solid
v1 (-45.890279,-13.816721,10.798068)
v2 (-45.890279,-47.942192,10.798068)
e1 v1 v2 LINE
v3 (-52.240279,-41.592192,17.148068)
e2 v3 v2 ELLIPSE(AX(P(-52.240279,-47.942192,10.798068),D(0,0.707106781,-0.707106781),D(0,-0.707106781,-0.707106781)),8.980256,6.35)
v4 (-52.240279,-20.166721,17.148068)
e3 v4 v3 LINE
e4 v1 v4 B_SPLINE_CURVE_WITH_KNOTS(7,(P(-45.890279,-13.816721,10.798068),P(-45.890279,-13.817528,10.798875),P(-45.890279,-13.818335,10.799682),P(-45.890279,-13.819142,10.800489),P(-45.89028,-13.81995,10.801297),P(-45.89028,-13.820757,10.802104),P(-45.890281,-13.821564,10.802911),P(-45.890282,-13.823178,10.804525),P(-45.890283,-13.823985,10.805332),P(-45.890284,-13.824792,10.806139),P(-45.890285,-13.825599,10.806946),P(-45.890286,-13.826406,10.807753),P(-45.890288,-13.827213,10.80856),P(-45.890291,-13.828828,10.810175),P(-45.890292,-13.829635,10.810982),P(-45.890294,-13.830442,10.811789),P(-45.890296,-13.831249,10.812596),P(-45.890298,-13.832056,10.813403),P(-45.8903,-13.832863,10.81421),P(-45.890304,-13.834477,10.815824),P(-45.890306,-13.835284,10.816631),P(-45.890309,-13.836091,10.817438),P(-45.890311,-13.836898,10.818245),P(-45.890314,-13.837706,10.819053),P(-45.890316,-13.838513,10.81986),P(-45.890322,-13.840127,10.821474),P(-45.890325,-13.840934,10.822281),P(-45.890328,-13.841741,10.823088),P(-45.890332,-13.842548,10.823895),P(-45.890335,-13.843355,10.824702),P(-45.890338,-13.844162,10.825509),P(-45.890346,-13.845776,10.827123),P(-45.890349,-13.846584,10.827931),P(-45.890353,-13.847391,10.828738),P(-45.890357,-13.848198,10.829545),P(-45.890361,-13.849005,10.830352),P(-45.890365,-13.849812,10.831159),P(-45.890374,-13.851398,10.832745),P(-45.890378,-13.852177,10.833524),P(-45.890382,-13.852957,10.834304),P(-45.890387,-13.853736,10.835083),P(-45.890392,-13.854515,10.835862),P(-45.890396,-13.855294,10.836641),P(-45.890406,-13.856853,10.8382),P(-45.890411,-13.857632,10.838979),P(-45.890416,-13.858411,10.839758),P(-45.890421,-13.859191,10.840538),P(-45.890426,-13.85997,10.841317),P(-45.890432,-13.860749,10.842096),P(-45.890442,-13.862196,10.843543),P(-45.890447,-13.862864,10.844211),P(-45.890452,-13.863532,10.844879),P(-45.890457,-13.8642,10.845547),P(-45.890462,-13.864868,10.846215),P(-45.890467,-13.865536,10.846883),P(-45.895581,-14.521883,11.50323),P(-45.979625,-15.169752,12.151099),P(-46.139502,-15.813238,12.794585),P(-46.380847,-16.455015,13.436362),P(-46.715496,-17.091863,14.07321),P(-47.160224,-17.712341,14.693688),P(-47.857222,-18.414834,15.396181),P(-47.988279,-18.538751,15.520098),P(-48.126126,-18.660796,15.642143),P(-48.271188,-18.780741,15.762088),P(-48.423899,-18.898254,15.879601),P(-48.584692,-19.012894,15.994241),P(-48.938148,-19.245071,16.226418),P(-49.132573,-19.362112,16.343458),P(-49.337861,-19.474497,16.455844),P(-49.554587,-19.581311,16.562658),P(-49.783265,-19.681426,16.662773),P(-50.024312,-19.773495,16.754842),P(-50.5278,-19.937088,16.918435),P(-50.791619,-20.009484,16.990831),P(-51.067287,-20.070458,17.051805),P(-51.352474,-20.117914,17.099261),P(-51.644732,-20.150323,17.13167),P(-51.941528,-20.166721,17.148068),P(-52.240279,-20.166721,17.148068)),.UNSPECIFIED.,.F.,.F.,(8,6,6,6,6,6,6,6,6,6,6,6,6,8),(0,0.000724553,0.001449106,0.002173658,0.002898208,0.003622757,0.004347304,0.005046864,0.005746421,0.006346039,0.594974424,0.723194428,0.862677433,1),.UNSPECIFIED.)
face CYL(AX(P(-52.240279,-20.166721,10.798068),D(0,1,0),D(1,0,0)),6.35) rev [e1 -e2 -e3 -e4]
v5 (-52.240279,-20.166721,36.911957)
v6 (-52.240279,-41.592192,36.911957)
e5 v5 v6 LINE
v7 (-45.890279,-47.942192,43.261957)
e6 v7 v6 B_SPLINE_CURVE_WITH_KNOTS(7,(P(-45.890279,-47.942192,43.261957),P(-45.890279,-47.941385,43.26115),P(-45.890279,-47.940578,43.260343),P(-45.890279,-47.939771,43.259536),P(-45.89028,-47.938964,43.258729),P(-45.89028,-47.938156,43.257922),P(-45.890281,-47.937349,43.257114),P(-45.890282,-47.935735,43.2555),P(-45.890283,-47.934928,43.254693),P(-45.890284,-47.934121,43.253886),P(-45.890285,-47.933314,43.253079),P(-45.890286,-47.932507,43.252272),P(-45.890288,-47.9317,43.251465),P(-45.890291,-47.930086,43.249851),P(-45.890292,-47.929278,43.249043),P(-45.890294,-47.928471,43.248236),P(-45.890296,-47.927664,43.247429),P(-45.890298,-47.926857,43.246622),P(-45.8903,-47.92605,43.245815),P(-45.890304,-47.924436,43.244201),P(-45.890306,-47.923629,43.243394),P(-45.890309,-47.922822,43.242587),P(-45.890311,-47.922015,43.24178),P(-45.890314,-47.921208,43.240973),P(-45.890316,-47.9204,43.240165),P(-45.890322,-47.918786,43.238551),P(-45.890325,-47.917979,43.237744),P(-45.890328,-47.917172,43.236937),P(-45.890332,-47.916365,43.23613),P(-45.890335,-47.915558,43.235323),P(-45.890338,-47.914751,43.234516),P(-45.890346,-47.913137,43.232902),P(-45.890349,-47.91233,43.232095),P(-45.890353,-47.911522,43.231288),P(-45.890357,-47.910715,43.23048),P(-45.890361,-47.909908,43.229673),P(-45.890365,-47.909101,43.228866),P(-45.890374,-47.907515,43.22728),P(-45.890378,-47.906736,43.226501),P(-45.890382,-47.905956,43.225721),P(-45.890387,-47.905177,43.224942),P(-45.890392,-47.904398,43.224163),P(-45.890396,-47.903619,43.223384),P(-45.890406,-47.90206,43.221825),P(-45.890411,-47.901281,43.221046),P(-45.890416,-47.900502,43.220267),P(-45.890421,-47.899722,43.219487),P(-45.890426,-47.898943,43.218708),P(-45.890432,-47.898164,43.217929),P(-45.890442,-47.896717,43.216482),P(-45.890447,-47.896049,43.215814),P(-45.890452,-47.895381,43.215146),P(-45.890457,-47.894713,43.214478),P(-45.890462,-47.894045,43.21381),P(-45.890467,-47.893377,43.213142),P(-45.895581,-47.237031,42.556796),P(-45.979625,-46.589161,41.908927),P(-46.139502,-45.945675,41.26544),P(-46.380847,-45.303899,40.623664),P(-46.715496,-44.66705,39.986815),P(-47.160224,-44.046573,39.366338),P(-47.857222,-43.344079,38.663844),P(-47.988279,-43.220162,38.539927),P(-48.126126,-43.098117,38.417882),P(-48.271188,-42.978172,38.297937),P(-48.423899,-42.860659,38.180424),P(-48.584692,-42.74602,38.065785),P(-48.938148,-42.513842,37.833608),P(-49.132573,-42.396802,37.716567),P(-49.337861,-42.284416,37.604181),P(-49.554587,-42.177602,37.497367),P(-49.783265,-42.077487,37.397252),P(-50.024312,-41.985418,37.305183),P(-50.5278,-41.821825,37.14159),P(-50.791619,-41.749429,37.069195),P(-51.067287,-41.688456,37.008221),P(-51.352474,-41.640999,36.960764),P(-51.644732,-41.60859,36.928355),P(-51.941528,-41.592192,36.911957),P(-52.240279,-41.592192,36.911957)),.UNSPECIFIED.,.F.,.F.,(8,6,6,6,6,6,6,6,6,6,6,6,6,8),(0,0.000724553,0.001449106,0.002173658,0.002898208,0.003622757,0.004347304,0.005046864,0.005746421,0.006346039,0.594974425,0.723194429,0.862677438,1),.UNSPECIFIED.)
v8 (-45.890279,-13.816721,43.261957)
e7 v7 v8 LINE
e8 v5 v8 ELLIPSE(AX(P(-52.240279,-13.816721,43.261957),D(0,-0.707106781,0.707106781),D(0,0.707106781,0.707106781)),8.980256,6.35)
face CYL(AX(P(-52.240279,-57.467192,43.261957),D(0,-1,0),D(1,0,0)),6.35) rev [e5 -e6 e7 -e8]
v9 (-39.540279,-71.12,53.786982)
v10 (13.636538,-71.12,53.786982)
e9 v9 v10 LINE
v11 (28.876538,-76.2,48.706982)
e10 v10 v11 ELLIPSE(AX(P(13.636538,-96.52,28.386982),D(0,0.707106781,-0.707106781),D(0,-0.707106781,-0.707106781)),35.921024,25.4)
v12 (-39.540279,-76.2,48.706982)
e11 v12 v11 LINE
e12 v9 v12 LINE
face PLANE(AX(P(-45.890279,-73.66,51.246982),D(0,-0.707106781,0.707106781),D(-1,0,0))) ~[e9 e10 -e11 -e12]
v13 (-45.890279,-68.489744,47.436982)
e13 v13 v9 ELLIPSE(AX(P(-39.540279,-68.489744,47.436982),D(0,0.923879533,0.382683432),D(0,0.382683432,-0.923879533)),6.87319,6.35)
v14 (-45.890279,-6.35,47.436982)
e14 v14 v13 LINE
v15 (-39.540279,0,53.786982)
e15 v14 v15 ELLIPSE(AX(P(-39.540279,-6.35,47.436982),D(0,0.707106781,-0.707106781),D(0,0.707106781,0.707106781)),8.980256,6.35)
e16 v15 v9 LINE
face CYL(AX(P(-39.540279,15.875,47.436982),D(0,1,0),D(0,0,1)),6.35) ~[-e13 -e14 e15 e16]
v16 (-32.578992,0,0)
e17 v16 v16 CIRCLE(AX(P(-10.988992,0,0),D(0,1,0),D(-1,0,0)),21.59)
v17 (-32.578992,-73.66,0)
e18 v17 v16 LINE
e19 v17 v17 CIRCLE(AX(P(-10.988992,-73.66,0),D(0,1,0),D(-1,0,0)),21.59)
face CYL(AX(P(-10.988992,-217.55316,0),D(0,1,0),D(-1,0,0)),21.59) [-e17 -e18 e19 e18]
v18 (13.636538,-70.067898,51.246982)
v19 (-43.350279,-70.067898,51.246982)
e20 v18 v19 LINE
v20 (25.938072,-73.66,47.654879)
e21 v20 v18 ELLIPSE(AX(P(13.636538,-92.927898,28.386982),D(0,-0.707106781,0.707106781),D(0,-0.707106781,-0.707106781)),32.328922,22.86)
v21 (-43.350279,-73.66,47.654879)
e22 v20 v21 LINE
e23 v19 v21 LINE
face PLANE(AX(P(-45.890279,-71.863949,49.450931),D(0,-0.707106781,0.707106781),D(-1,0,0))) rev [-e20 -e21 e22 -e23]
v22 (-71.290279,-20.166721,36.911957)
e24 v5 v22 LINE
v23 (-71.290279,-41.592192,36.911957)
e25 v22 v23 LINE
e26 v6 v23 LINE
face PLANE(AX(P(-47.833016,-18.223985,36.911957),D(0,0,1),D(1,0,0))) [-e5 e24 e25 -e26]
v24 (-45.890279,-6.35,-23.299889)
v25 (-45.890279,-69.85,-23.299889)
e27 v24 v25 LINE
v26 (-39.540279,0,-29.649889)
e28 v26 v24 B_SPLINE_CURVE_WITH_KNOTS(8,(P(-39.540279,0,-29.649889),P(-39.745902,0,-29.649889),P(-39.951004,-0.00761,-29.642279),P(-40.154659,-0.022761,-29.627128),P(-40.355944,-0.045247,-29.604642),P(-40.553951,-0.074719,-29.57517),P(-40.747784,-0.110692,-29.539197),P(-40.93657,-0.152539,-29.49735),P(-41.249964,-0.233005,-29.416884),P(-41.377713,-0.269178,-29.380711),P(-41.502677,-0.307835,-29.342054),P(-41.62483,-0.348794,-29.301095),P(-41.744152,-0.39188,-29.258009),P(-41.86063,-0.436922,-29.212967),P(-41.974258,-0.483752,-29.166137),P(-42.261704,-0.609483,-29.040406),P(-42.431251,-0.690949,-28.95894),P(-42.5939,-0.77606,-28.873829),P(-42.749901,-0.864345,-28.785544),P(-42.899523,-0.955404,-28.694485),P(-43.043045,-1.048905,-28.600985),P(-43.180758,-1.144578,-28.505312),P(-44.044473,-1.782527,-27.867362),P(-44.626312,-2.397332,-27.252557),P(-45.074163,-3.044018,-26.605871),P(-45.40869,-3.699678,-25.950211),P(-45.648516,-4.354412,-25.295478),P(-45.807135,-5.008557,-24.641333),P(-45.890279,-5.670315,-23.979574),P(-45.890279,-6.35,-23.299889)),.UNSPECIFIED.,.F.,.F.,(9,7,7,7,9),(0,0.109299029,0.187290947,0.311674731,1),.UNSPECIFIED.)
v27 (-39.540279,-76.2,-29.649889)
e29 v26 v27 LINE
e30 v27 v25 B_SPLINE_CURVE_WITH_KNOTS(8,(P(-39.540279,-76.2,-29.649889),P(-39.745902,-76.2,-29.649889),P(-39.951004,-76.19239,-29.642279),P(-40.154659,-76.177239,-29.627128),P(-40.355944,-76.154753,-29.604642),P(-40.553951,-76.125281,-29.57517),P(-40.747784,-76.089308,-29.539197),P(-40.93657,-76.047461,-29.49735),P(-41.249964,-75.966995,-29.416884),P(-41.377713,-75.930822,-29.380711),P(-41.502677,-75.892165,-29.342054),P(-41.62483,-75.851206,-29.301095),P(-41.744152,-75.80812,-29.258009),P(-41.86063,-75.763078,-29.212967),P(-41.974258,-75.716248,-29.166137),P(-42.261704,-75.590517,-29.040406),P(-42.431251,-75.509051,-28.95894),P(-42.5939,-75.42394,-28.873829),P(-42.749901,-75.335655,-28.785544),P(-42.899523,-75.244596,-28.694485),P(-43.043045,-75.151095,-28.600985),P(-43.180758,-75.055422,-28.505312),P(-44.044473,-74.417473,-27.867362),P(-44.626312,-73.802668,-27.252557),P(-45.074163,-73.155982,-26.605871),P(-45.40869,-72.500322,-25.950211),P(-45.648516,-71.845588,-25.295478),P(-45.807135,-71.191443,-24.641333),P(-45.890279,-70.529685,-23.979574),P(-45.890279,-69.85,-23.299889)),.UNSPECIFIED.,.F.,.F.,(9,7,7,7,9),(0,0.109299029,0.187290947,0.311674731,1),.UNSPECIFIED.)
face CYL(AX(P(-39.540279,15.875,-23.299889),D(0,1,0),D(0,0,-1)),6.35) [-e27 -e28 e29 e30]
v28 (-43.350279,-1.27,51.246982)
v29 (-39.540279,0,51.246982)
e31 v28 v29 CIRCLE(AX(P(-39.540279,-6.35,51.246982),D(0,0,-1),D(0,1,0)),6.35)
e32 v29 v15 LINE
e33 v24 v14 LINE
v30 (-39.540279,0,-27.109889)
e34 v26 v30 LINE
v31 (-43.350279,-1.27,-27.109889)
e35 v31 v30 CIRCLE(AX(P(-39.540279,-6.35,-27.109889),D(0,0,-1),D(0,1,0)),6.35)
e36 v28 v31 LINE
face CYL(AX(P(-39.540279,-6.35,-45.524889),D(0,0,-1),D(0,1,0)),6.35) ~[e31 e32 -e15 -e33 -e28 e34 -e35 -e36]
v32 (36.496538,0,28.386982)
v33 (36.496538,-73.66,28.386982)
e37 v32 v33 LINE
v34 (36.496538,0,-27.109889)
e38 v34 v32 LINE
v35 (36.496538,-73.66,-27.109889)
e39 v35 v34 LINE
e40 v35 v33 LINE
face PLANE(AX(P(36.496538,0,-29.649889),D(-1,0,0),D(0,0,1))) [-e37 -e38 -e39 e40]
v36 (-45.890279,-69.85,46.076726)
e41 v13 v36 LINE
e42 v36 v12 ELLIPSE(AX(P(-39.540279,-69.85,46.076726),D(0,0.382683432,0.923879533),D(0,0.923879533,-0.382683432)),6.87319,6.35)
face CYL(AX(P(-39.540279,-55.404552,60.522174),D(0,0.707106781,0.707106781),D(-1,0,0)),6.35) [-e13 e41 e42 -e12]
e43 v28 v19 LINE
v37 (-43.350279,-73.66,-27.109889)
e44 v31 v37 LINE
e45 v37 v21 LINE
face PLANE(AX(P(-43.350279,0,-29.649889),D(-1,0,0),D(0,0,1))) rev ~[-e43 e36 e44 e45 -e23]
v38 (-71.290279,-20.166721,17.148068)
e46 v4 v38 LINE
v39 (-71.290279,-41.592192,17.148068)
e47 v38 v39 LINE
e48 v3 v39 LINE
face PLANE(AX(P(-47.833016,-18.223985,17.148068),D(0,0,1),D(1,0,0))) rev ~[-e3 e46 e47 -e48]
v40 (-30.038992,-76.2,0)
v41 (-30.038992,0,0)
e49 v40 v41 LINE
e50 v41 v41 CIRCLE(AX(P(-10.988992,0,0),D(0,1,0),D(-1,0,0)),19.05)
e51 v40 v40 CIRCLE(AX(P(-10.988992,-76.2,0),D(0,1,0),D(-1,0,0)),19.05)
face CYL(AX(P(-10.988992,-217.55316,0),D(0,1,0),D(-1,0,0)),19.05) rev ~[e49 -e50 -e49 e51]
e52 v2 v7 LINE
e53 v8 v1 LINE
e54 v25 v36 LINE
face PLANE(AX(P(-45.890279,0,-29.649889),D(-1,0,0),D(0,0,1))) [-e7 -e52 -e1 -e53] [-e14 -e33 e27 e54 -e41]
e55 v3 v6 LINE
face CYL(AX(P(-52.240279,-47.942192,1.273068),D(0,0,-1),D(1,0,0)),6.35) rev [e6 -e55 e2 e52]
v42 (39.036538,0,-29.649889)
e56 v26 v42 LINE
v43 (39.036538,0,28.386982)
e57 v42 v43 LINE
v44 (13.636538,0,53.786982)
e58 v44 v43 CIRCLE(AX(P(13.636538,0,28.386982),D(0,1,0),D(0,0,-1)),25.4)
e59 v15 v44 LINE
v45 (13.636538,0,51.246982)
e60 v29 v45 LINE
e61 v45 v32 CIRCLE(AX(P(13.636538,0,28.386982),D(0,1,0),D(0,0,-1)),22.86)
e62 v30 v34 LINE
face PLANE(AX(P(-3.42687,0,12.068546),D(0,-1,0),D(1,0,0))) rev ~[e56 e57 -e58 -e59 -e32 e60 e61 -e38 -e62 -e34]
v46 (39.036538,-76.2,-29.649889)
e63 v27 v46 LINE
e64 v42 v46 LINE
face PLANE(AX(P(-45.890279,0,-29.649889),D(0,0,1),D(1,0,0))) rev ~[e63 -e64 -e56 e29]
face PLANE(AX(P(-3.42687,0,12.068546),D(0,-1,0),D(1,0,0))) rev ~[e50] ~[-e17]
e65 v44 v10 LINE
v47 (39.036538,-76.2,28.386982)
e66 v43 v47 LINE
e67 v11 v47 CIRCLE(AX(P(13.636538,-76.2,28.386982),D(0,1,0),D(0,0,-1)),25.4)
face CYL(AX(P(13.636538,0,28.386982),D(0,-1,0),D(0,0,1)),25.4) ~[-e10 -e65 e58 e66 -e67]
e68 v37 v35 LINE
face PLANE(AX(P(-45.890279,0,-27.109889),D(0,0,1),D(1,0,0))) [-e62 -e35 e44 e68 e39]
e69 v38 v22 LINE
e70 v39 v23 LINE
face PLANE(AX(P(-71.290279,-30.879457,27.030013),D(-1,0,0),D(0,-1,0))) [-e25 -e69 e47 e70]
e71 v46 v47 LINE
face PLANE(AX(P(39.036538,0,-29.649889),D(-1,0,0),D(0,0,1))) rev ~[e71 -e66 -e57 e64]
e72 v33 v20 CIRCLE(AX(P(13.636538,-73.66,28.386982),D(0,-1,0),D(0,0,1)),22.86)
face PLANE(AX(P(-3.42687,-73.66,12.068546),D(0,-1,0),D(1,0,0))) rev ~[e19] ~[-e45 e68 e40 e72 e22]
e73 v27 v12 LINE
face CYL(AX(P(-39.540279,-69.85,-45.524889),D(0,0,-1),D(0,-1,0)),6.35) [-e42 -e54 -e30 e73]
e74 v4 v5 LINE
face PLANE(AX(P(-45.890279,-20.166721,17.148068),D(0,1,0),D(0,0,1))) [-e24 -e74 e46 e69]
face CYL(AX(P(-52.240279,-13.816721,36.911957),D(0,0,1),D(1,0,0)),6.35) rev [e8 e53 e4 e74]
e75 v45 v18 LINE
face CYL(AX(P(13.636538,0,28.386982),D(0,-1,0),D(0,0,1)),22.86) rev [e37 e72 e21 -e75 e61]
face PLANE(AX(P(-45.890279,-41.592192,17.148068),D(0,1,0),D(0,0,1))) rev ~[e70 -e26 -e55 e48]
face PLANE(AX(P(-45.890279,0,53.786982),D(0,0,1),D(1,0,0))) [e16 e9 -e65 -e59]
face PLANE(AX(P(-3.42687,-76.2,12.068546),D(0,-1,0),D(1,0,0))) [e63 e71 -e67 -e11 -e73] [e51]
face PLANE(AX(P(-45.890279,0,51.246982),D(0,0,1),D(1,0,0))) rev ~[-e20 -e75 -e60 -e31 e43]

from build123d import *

# Parameters (mm, degrees)
F0_W          = 84.9268175662
F0_H          = 83.4368709475
F1_DEPTH      = 76.2
F2_SIZE       = 5.08
F3_R          = 25.4
F5_D          = 38.1
F8_T          = -2.54
F9_W          = 21.4254707098
F9_H          = 19.7638887912
F10_DEPTH     = 25.4
F11_T1_DEPTH  = 19.7638887912
F11_T3_DEPTH  = 21.4254707098
F11_T9_DEPTH  = 35.6388887912
F11_T13_DEPTH = 37.3004707098
F11_T20_DEPTH = 35.6388887912
F11_T24_DEPTH = 37.3004707098
F11_T31_DEPTH = 37.3004707098
F11_T35_DEPTH = 35.6388887912
F11_T42_DEPTH = 35.6388887912
F11_T46_DEPTH = 37.3004707098
F11_T49_DEPTH = 102.87
F11_T51_DEPTH = 38.9342048969
F11_T53_DEPTH = 115.1868709475
F11_T55_DEPTH = 110.1068709475
F11_T57_DEPTH = 107.95


# Not quite as in the source:
# - a fillet or chamfer that OpenCascade refuses, or shapes differently, is made with other operations: its cross-section is extruded or revolved along the edge and cut away or added


with BuildPart() as f1:
    # F0 (on Front) → F1 (new body)
    with BuildSketch(Plane.XZ):
        with Locations((-3.4268703312, 12.0685463771)):
            Rectangle(F0_W, F0_H)
    extrude(amount=F1_DEPTH)

    # F2
    f2_edges = [f1.edges().sort_by_distance(p)[0] for p in [
        (-3.42687, -76.2, 53.786982),
    ]]
    chamfer(f2_edges, length=F2_SIZE)

    # F3
    f3_edges = [f1.edges().sort_by_distance(p)[0] for p in [
        (39.036538, -35.56, 53.786982),
    ]]
    fillet(f3_edges, radius=F3_R)

    # F5 (through all)
    with Locations(Plane.XZ.offset(76.2)):
        with Locations((-10.9889917076, 0)):
            Hole(F5_D / 2)

    # F8
    f8_openings = [f1.faces().sort_by_distance(p)[0] for p in [
        (-16.12687, 0, 52.596424),
    ]]
    offset(amount=F8_T, openings=f8_openings)

    # F9 (on face) → F10 (join)
    with BuildSketch(Plane(origin=(-45.8902791142, 0, 0), x_dir=(0, -1, 0), z_dir=(-1, 0, 0))):
        with Locations((30.8794565499, 27.0300125703)):
            Rectangle(F9_W, F9_H)
    extrude(amount=F10_DEPTH)

    # F11: fillet of radius 6.35 on 9 edges, made by hand

    # F11_s2 → F11_t1 (join)
    with BuildSketch(Plane.XY.offset(17.1480681747)):
        with BuildLine():
            ThreePointArc((-45.8902791142, -13.816721195), (-47.7501510537, -18.3068492555), (-52.2402791142, -20.166721195))
            Line((-52.2402791142, -20.166721195), (-45.8902791142, -20.166721195))
            Line((-45.8902791142, -20.166721195), (-45.8902791142, -13.816721195))
        make_face()
        with BuildLine():
            ThreePointArc((-45.8902791142, -47.9421919048), (-47.7501510537, -43.4520638442), (-52.2402791142, -41.5921919048))
            Line((-52.2402791142, -41.5921919048), (-45.8902791142, -41.5921919048))
            Line((-45.8902791142, -41.5921919048), (-45.8902791142, -47.9421919048))
        make_face()
    extrude(amount=F11_T1_DEPTH)

    # F11_s4 → F11_t3 (join)
    with BuildSketch(Plane.XZ.offset(20.166721195)):
        with BuildLine():
            ThreePointArc((-45.8902791142, 43.2619569659), (-47.7501510537, 38.7718289054), (-52.2402791142, 36.9119569659))
            Line((-52.2402791142, 36.9119569659), (-45.8902791142, 36.9119569659))
            Line((-45.8902791142, 36.9119569659), (-45.8902791142, 43.2619569659))
        make_face()
        with BuildLine():
            ThreePointArc((-45.8902791142, 10.7980681747), (-47.7501510537, 15.2881962353), (-52.2402791142, 17.1480681747))
            Line((-52.2402791142, 17.1480681747), (-45.8902791142, 17.1480681747))
            Line((-45.8902791142, 17.1480681747), (-45.8902791142, 10.7980681747))
        make_face()
    extrude(amount=F11_T3_DEPTH)


with BuildPart() as f11_tool7:
    # F11_s8 → F11_t9 (new body)
    with BuildSketch(Plane.XY.offset(52.7869569659)):
        with BuildLine():
            ThreePointArc((-45.8902791142, -13.816721195), (-47.7501510537, -18.3068492555), (-52.2402791142, -20.166721195))
            Line((-52.2402791142, -20.166721195), (-45.8902791142, -20.166721195))
            Line((-45.8902791142, -20.166721195), (-45.8902791142, -13.816721195))
        make_face()
    extrude(amount=-F11_T9_DEPTH)

    split(bisect_by=Plane.XY.offset(36.9119569659), keep=Keep.TOP)


with BuildPart() as f11_tool11:
    # F11_s12 → F11_t13 (new body)
    with BuildSketch(Plane.XZ.offset(41.5921919048)):
        with BuildLine():
            ThreePointArc((-45.8902791142, 43.2619569659), (-47.7501510537, 38.7718289054), (-52.2402791142, 36.9119569659))
            Line((-52.2402791142, 36.9119569659), (-45.8902791142, 36.9119569659))
            Line((-45.8902791142, 36.9119569659), (-45.8902791142, 43.2619569659))
        make_face()
    extrude(amount=-F11_T13_DEPTH)

    split(bisect_by=Plane.XZ.offset(20.166721195), keep=Keep.BOTTOM)


with BuildPart() as f11_tool7_1:
    add(f11_tool7.part)

    # F11_t15: intersect F11_tool11
    add(f11_tool11.part, mode=Mode.INTERSECT)


with BuildPart() as f1_1:
    add(f1.part)

    # F11_t5: union F11_tool7
    add(f11_tool7_1.part)


with BuildPart() as f11_tool18:
    # F11_s19 → F11_t20 (new body)
    with BuildSketch(Plane.XY.offset(36.9119569659)):
        with BuildLine():
            ThreePointArc((-45.8902791142, -13.816721195), (-47.7501510537, -18.3068492555), (-52.2402791142, -20.166721195))
            Line((-52.2402791142, -20.166721195), (-45.8902791142, -20.166721195))
            Line((-45.8902791142, -20.166721195), (-45.8902791142, -13.816721195))
        make_face()
    extrude(amount=-F11_T20_DEPTH)

    split(bisect_by=Plane.XY.offset(17.1480681747), keep=Keep.BOTTOM)


with BuildPart() as f11_tool22:
    # F11_s23 → F11_t24 (new body)
    with BuildSketch(Plane.XZ.offset(4.291721195)):
        with BuildLine():
            ThreePointArc((-45.8902791142, 10.7980681747), (-47.7501510537, 15.2881962353), (-52.2402791142, 17.1480681747))
            Line((-52.2402791142, 17.1480681747), (-45.8902791142, 17.1480681747))
            Line((-45.8902791142, 17.1480681747), (-45.8902791142, 10.7980681747))
        make_face()
    extrude(amount=F11_T24_DEPTH)

    split(bisect_by=Plane.XZ.offset(20.166721195), keep=Keep.BOTTOM)


with BuildPart() as f11_tool18_1:
    add(f11_tool18.part)

    # F11_t26: intersect F11_tool22
    add(f11_tool22.part, mode=Mode.INTERSECT)


with BuildPart() as f1_2:
    add(f1_1.part)

    # F11_t16: union F11_tool18
    add(f11_tool18_1.part)


with BuildPart() as f11_tool29:
    # F11_s30 → F11_t31 (new body)
    with BuildSketch(Plane.XZ.offset(57.4671919048)):
        with BuildLine():
            ThreePointArc((-45.8902791142, 43.2619569659), (-47.7501510537, 38.7718289054), (-52.2402791142, 36.9119569659))
            Line((-52.2402791142, 36.9119569659), (-45.8902791142, 36.9119569659))
            Line((-45.8902791142, 36.9119569659), (-45.8902791142, 43.2619569659))
        make_face()
    extrude(amount=-F11_T31_DEPTH)

    split(bisect_by=Plane.XZ.offset(41.5921919048), keep=Keep.TOP)


with BuildPart() as f11_tool33:
    # F11_s34 → F11_t35 (new body)
    with BuildSketch(Plane.XY.offset(17.1480681747)):
        with BuildLine():
            ThreePointArc((-45.8902791142, -47.9421919048), (-47.7501510537, -43.4520638442), (-52.2402791142, -41.5921919048))
            Line((-52.2402791142, -41.5921919048), (-45.8902791142, -41.5921919048))
            Line((-45.8902791142, -41.5921919048), (-45.8902791142, -47.9421919048))
        make_face()
    extrude(amount=F11_T35_DEPTH)

    split(bisect_by=Plane.XY.offset(36.9119569659), keep=Keep.TOP)


with BuildPart() as f11_tool29_1:
    add(f11_tool29.part)

    # F11_t37: intersect F11_tool33
    add(f11_tool33.part, mode=Mode.INTERSECT)


with BuildPart() as f1_3:
    add(f1_2.part)

    # F11_t27: union F11_tool29
    add(f11_tool29_1.part)


with BuildPart() as f11_tool40:
    # F11_s41 → F11_t42 (new body)
    with BuildSketch(Plane.XY.offset(1.2730681747)):
        with BuildLine():
            ThreePointArc((-45.8902791142, -47.9421919048), (-47.7501510537, -43.4520638442), (-52.2402791142, -41.5921919048))
            Line((-52.2402791142, -41.5921919048), (-45.8902791142, -41.5921919048))
            Line((-45.8902791142, -41.5921919048), (-45.8902791142, -47.9421919048))
        make_face()
    extrude(amount=F11_T42_DEPTH)

    split(bisect_by=Plane.XY.offset(17.1480681747), keep=Keep.BOTTOM)


with BuildPart() as f11_tool44:
    # F11_s45 → F11_t46 (new body)
    with BuildSketch(Plane.XZ.offset(20.166721195)):
        with BuildLine():
            ThreePointArc((-45.8902791142, 10.7980681747), (-47.7501510537, 15.2881962353), (-52.2402791142, 17.1480681747))
            Line((-52.2402791142, 17.1480681747), (-45.8902791142, 17.1480681747))
            Line((-45.8902791142, 17.1480681747), (-45.8902791142, 10.7980681747))
        make_face()
    extrude(amount=F11_T46_DEPTH)

    split(bisect_by=Plane.XZ.offset(41.5921919048), keep=Keep.TOP)


with BuildPart() as f11_tool40_1:
    add(f11_tool40.part)

    # F11_t48: intersect F11_tool44
    add(f11_tool44.part, mode=Mode.INTERSECT)


with BuildPart() as f1_4:
    add(f1_3.part)

    # F11_t38: union F11_tool40
    add(f11_tool40_1.part)

    # F11_s50 → F11_t49 (cut)
    with BuildSketch(Plane.XZ.offset(-15.875)):
        with BuildLine():
            ThreePointArc((-39.5402791142, 53.7869818509), (-44.0304071748, 51.9271099114), (-45.8902791142, 47.4369818509))
            Line((-45.8902791142, 47.4369818509), (-45.8902791142, 53.7869818509))
            Line((-45.8902791142, 53.7869818509), (-39.5402791142, 53.7869818509))
        make_face()
    extrude(amount=F11_T49_DEPTH, mode=Mode.SUBTRACT)

    # F11_s52 → F11_t51 (cut)
    with BuildSketch(Plane(origin=(0, 2.5588110768, 2.5588110768), x_dir=(1, 0, 0), z_dir=(0, -0.7071067812, -0.7071067812))):
        with BuildLine():
            ThreePointArc((-45.8902791142, 81.9725738843), (-44.0304071748, 86.4627019448), (-39.5402791142, 88.3225738843))
            Line((-39.5402791142, 88.3225738843), (-45.8902791142, 88.3225738843))
            Line((-45.8902791142, 88.3225738843), (-45.8902791142, 81.9725738843))
        make_face()
    extrude(amount=F11_T51_DEPTH, mode=Mode.SUBTRACT)

    # F11_s54 → F11_t53 (cut)
    with BuildSketch(Plane.XY.offset(-45.5248890966)):
        with BuildLine():
            ThreePointArc((-39.5402791142, 0), (-44.0304071748, -1.8598719395), (-45.8902791142, -6.35))
            Line((-45.8902791142, -6.35), (-45.8902791142, 0))
            Line((-45.8902791142, 0), (-39.5402791142, 0))
        make_face()
    extrude(amount=F11_T53_DEPTH, mode=Mode.SUBTRACT)

    # F11_s56 → F11_t55 (cut)
    with BuildSketch(Plane.XY.offset(-45.5248890966)):
        with BuildLine():
            ThreePointArc((-39.5402791142, -76.2), (-44.0304071748, -74.3401280605), (-45.8902791142, -69.85))
            Line((-45.8902791142, -69.85), (-45.8902791142, -76.2))
            Line((-45.8902791142, -76.2), (-39.5402791142, -76.2))
        make_face()
    extrude(amount=F11_T55_DEPTH, mode=Mode.SUBTRACT)

    # F11_s58 → F11_t57 (cut)
    with BuildSketch(Plane.XZ.offset(-15.875)):
        with BuildLine():
            ThreePointArc((-39.5402791142, -29.6498890966), (-44.0304071748, -27.7900171572), (-45.8902791142, -23.2998890966))
            Line((-45.8902791142, -23.2998890966), (-45.8902791142, -29.6498890966))
            Line((-45.8902791142, -29.6498890966), (-39.5402791142, -29.6498890966))
        make_face()
    extrude(amount=F11_T57_DEPTH, mode=Mode.SUBTRACT)


solid = f1_4.part
